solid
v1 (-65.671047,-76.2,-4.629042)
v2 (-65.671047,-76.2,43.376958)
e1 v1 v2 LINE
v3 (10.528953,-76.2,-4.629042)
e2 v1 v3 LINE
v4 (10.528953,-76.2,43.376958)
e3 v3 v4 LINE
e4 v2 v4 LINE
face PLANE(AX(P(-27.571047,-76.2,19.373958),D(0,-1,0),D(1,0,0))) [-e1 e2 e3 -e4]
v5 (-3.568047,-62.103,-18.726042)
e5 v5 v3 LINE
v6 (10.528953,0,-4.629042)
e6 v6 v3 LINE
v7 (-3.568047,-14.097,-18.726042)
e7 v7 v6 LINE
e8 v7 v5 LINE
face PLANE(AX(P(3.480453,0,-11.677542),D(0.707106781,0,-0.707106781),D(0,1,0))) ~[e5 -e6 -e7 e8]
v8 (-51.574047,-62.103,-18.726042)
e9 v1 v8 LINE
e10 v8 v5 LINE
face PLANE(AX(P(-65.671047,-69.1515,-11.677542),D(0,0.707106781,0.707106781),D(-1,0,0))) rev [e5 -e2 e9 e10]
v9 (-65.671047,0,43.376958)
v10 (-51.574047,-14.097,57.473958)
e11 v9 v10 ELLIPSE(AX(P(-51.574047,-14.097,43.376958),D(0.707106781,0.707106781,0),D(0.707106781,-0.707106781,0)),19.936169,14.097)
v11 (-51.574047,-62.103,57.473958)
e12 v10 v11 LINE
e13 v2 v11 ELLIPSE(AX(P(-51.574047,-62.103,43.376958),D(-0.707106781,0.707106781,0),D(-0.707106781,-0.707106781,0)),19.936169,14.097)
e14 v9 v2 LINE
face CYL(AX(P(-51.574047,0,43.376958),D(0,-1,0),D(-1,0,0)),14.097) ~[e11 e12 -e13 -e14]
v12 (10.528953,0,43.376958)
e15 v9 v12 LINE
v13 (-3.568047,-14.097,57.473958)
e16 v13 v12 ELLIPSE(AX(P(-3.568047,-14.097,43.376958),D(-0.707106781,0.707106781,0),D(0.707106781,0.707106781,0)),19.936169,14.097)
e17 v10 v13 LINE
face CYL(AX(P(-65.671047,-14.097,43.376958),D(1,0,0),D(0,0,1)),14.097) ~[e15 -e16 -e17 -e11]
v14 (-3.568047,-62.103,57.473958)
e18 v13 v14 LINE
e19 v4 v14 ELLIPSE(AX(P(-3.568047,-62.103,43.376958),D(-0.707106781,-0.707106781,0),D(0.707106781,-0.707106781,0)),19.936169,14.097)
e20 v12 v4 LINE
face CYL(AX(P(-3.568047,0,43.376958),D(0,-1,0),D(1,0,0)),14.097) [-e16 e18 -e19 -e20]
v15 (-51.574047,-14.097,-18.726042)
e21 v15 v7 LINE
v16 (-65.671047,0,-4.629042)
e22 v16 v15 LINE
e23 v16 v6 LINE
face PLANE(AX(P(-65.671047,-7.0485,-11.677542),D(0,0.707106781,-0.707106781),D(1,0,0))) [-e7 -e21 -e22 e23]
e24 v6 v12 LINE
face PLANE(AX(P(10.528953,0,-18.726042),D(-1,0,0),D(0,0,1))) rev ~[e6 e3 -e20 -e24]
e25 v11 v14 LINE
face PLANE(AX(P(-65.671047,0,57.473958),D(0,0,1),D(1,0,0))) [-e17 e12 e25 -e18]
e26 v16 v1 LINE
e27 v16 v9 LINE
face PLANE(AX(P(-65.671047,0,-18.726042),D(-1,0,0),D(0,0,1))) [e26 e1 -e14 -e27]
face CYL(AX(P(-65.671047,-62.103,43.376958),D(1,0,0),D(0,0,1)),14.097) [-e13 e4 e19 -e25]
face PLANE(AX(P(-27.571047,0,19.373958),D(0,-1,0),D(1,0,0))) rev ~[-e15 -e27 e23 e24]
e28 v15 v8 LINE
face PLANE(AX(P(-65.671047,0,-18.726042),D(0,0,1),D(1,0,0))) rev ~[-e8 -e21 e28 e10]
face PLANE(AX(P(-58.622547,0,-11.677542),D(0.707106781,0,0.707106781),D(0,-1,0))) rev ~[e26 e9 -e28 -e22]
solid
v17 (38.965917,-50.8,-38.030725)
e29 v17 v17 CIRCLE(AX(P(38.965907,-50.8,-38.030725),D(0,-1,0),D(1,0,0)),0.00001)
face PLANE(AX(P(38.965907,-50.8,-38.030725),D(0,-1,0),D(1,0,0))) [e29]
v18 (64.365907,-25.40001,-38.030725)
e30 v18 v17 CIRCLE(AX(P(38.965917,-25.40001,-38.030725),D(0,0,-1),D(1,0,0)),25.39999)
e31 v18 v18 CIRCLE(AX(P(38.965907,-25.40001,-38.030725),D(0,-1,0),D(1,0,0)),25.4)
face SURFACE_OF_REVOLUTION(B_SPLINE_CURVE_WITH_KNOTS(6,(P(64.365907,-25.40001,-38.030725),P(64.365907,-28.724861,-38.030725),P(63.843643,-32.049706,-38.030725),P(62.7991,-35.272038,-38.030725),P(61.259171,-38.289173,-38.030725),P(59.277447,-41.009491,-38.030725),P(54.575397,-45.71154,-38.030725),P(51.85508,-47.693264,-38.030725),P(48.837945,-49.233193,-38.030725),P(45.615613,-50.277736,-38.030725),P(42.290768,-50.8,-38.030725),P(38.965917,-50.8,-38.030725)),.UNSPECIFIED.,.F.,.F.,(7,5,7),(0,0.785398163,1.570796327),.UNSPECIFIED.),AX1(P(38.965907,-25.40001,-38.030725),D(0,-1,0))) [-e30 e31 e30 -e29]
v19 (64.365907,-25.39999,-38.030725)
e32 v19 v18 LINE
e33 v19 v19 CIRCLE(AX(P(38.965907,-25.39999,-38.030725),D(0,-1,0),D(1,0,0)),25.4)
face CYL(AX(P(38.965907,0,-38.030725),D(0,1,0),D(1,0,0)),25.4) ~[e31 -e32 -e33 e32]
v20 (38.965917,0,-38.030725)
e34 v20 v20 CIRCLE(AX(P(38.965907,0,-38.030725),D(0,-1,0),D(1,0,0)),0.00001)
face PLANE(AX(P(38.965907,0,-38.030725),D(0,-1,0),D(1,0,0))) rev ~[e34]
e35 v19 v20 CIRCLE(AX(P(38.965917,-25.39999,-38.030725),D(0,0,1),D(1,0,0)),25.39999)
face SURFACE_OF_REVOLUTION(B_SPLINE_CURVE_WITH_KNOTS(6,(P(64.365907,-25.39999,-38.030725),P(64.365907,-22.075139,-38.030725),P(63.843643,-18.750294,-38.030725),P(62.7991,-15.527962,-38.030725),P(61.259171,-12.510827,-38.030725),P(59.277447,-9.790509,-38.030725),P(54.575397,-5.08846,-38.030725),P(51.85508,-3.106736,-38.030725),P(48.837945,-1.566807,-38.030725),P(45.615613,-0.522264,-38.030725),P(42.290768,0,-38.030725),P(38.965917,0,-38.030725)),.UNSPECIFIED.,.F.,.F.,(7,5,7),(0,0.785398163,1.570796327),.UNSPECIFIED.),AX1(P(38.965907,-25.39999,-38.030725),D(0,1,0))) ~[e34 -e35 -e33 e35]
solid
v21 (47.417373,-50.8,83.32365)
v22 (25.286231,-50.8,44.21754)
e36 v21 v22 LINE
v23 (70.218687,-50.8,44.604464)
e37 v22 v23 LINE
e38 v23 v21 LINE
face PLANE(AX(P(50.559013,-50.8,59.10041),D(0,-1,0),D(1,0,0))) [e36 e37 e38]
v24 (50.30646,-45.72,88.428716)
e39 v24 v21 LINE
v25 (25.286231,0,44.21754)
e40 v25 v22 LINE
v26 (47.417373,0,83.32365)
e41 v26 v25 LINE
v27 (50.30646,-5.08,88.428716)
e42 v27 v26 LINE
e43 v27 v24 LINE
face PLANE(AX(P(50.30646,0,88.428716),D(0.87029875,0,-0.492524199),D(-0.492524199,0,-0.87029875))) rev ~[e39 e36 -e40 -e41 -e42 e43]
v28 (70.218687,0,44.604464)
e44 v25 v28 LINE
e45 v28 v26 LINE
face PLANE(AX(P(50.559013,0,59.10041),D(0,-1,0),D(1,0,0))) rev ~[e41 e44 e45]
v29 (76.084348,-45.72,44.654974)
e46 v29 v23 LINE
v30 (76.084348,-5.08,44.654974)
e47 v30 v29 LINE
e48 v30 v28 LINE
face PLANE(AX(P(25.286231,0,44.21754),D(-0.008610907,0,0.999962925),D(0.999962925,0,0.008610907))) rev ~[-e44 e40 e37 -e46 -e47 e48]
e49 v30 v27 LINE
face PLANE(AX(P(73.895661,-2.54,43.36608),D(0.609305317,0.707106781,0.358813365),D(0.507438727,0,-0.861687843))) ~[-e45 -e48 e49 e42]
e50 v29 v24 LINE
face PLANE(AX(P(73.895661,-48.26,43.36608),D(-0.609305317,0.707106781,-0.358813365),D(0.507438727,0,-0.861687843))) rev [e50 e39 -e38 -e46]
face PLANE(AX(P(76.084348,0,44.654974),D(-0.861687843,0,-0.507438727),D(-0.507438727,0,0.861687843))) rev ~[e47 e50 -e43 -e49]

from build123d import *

# Parameters (mm, degrees)
F0_W     = 76.2
F0_H     = 76.2
F1_DEPTH = 76.2
F2_R     = 14.097
F3_SIZE  = 14.097
F4_R     = 25.4
F5_DEPTH = 50.8
F6_R     = 25.39999
F8_DEPTH = 50.8
F9_SIZE2 = 5.08
F9_SIZE  = 5.08


# Not quite as in the source:
# - a fillet or chamfer is up to 0.001 mm smaller than in the source, because OpenCascade refuses the exact size


with BuildPart() as f1:
    # F0 (on Front) → F1 (new body)
    with BuildSketch(Plane.XZ):
        with Locations((-27.5710467249, 19.3739583973)):
            Rectangle(F0_W, F0_H)
    extrude(amount=F1_DEPTH)

    # F2
    f2_edges = [f1.edges().sort_by_distance(p)[0] for p in [
        (-65.671047, -38.1, 57.473958),
        (-27.571047, 0, 57.473958),
        (10.528953, -38.1, 57.473958),
        (-27.571047, -76.2, 57.473958),
    ]]
    fillet(f2_edges, radius=F2_R)

    # F3
    f3_edges = [f1.edges().sort_by_distance(p)[0] for p in [
        (-65.671047, -38.1, -18.726042),
        (-27.571047, -76.2, -18.726042),
        (10.528953, -38.1, -18.726042),
        (-27.571047, 0, -18.726042),
    ]]
    chamfer(f3_edges, length=F3_SIZE)


with BuildPart() as f5:
    # F4 (on Front) → F5 (new body)
    with BuildSketch(Plane.XZ):
        with Locations((38.9659069479, -38.0307249725)):
            Circle(F4_R)
    extrude(amount=F5_DEPTH)

    # F6 (radius 25.4 in the source; OpenCascade refuses exactly that, so slightly less here)
    f6_edges = [f5.edges().sort_by_distance(p)[0] for p in [
        (13.565907, -50.8, -38.030725),
        (13.565907, 0, -38.030725),
    ]]
    fillet(f6_edges, radius=F6_R)


with BuildPart() as f8:
    # F7 (on Front) → F8 (new body)
    with BuildSketch(Plane.XZ):
        Polygon((76.0843477927, 44.654974036), (50.3064604832, 88.4287164607), (25.2862311795, 44.2175399825), align=None)
    extrude(amount=F8_DEPTH)

    # F9
    f9_edges = [f8.edges().sort_by_distance(p)[0] for p in [
        (63.195404, 0, 66.541845),
        (63.195404, -50.8, 66.541845),
    ]]
    chamfer(f9_edges, length=F9_SIZE, length2=F9_SIZE2)


solid = Compound([f1.part, f5.part, f8.part])
